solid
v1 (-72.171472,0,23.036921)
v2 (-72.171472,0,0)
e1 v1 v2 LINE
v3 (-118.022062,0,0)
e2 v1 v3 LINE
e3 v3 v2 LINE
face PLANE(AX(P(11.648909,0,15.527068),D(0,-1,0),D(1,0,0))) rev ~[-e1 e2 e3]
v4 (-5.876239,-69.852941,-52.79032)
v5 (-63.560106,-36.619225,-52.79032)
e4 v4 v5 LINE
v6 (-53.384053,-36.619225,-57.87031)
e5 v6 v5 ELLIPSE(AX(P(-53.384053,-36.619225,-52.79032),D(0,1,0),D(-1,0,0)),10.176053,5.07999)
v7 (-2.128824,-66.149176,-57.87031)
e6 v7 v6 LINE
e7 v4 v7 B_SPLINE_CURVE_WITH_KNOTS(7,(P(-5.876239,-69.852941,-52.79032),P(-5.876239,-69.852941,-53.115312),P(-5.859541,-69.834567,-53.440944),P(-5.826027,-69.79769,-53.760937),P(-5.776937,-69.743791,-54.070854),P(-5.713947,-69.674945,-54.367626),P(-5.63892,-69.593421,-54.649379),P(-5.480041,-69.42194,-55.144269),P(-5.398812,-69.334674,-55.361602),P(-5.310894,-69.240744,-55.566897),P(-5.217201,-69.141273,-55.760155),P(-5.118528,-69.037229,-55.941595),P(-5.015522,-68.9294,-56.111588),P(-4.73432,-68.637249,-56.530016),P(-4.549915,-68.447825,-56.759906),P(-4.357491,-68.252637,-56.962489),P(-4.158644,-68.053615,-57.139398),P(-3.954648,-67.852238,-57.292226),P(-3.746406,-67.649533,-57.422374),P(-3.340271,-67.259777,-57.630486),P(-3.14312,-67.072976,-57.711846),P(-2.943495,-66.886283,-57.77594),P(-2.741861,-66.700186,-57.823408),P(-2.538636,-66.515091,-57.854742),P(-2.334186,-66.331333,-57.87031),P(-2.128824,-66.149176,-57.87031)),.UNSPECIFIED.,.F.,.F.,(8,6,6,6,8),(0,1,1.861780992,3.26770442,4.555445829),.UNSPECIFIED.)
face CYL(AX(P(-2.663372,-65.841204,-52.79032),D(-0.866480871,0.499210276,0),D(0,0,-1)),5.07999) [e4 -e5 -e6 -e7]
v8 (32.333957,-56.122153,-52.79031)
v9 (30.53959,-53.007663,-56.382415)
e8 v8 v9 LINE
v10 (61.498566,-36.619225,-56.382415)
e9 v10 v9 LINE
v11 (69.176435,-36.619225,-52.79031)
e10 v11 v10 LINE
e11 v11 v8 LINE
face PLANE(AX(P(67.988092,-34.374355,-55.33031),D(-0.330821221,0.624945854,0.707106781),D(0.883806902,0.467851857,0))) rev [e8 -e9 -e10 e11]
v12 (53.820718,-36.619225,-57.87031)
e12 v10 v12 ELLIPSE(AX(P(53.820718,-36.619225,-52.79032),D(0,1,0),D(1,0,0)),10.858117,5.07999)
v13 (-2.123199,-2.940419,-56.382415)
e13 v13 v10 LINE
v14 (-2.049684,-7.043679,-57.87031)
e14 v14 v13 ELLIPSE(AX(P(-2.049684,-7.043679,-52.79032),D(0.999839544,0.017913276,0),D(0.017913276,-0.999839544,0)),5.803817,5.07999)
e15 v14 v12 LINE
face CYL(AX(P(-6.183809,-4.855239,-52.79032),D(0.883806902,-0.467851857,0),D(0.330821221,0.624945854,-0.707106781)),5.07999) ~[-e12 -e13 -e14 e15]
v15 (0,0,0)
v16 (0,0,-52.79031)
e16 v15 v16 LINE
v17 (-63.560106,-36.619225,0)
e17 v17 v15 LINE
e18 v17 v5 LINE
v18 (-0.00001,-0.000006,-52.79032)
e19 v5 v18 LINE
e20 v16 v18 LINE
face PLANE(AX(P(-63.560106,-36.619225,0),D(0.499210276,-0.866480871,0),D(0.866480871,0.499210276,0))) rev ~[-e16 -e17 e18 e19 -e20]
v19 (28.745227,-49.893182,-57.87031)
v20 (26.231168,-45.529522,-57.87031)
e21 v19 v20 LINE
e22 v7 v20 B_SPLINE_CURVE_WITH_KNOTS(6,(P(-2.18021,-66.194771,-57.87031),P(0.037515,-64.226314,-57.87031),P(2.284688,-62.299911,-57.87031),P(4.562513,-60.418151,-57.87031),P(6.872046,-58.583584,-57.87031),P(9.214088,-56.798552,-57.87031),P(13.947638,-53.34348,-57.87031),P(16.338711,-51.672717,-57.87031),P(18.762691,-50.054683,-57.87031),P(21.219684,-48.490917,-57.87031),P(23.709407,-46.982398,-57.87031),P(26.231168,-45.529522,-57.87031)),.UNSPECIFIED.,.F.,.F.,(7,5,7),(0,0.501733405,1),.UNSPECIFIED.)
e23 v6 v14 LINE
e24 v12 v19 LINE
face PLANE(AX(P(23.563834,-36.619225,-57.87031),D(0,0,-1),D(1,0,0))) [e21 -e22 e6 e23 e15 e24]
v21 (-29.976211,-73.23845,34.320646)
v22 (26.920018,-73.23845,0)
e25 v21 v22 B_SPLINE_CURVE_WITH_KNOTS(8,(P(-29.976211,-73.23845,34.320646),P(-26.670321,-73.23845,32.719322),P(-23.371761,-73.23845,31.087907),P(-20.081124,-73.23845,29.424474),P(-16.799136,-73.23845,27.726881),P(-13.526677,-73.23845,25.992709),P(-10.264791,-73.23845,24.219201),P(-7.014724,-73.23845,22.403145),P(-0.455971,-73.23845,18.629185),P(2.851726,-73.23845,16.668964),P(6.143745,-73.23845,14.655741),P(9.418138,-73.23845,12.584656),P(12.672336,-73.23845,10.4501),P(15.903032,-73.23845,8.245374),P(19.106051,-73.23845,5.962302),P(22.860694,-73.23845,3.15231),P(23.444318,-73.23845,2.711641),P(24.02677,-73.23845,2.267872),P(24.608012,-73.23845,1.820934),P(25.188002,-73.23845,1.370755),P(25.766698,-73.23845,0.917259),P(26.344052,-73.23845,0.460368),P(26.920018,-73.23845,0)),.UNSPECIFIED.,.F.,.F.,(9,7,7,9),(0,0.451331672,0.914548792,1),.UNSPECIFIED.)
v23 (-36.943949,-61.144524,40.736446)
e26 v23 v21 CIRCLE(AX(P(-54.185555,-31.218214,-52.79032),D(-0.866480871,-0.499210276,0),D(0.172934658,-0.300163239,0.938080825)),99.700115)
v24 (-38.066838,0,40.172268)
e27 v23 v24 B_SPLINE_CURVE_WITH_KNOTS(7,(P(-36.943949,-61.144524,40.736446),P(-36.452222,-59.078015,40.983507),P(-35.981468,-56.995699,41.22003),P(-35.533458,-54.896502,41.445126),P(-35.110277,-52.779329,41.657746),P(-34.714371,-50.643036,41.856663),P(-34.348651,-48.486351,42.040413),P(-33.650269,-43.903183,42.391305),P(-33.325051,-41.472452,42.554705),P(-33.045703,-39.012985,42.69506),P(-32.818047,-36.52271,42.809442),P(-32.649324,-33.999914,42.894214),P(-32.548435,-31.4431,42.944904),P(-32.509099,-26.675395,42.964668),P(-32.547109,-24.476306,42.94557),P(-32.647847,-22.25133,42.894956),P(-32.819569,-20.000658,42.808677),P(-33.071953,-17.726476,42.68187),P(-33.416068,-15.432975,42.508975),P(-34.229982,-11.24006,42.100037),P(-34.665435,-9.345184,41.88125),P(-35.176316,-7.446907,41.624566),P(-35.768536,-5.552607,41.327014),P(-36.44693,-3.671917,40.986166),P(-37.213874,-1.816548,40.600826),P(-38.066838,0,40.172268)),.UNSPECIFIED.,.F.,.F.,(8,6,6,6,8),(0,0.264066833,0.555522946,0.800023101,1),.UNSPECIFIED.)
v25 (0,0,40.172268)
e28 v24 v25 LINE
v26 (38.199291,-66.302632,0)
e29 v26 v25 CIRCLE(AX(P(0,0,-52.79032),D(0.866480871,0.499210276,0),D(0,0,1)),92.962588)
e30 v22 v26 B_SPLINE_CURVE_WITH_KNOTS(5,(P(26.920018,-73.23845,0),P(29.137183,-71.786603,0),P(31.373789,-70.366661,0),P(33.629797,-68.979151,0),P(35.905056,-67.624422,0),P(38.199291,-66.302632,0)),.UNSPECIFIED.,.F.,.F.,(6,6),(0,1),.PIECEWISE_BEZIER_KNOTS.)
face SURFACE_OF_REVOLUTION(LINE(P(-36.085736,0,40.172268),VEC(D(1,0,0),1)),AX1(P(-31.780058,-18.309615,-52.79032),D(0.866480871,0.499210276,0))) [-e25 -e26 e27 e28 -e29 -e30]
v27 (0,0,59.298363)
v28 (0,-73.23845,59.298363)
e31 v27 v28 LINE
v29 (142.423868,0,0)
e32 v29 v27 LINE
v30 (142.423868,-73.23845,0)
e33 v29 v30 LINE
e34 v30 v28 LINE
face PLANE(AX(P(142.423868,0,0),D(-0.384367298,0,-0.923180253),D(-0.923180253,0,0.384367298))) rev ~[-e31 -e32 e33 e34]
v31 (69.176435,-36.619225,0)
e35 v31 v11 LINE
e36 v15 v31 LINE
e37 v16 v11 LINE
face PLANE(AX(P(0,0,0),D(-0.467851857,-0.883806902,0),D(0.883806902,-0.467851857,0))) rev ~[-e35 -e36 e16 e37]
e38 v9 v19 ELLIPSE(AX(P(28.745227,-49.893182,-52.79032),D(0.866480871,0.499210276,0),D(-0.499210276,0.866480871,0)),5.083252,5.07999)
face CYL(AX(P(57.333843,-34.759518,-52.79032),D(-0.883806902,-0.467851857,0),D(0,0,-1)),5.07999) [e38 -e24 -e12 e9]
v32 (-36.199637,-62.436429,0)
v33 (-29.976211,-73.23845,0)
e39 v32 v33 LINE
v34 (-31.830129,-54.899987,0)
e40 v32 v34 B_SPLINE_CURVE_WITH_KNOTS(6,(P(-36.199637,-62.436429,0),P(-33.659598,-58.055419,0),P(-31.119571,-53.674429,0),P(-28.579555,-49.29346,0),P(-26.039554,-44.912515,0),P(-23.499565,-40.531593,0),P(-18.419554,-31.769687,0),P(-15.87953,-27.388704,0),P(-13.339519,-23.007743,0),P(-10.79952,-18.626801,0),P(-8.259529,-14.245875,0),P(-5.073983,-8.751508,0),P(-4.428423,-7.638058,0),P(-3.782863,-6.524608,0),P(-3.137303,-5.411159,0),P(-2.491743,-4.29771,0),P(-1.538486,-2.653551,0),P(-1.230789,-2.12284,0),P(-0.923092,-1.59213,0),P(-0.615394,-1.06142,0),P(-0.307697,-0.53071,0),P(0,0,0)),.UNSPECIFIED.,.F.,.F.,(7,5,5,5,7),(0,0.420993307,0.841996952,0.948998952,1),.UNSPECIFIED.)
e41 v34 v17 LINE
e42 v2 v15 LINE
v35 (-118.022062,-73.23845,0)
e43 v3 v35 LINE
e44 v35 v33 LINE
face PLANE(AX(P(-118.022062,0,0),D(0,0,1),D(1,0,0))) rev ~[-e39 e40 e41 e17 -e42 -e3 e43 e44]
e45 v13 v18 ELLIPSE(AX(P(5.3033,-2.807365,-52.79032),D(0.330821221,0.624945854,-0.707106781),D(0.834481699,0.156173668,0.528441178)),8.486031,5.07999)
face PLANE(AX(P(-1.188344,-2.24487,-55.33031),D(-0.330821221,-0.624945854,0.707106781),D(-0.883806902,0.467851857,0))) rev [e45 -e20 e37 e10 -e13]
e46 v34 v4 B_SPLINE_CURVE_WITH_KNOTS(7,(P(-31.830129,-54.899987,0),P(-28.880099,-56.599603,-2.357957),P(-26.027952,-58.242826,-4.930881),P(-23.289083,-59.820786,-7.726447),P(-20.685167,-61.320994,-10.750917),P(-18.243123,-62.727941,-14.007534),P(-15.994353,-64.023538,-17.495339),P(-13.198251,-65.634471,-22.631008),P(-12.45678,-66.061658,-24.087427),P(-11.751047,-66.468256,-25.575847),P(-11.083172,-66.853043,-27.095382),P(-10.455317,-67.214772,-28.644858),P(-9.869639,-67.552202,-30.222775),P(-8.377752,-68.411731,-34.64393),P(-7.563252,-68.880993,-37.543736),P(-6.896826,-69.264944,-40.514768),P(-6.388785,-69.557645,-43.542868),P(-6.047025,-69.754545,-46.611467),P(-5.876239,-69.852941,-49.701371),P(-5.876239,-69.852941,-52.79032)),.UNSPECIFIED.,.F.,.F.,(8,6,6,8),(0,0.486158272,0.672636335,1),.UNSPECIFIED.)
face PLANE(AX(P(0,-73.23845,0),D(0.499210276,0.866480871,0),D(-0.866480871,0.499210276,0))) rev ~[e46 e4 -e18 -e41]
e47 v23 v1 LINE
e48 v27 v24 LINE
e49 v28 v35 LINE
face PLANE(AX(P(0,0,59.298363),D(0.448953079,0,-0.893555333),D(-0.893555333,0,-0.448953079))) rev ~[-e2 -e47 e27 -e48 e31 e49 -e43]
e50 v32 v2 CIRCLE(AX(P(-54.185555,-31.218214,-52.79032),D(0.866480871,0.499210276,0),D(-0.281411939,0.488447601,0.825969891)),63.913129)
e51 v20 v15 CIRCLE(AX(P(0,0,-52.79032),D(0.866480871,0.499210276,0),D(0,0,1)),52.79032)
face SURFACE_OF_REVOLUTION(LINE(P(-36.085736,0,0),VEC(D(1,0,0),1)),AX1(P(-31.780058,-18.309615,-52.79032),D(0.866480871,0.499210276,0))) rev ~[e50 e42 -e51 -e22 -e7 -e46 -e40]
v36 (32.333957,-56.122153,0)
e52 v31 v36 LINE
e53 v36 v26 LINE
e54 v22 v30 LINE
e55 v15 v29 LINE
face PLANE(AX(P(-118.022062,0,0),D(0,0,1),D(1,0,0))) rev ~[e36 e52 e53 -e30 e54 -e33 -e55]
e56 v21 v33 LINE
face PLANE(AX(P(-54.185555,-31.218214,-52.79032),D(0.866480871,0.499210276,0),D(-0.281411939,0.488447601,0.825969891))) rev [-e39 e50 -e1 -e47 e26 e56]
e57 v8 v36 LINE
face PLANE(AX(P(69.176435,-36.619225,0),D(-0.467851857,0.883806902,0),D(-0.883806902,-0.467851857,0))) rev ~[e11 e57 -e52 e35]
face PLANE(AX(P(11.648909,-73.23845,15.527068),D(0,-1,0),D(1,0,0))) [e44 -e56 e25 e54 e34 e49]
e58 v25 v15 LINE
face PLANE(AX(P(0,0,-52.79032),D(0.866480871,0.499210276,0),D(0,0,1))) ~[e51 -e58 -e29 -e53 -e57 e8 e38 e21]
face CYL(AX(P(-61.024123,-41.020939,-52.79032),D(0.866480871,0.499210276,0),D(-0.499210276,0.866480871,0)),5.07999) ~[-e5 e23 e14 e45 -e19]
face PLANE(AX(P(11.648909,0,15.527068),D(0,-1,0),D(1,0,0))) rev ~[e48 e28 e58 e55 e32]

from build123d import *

# Parameters (mm, degrees)
F1_DEPTH = 73.23845
F3_DEPTH = 57.87031
F4_SIZE  = 5.08
F5_R     = 5.07999
F6_W     = 72.171472013
F6_H     = 40.1722677052


# Not quite as in the source:
# - a fillet or chamfer is up to 0.001 mm smaller than in the source, because OpenCascade refuses the exact size


with BuildPart() as f1:
    # F0 (on Front) → F1 (new body)
    with BuildSketch(Plane.XZ):
        Polygon((0, 59.2983625829), (-118.0220618844, 0), (142.4238681793, 0), align=None)
    extrude(amount=F1_DEPTH)

    # F2 (on face) → F3 (join)
    with BuildSketch(Plane(origin=(0, 0, 0), x_dir=(1, 0, 0), z_dir=(0, 0, -1))):
        Polygon((69.1764354706, 36.619225), (0, 73.23845), (0, 0), align=None)
        Polygon((0, 0), (0, 73.23845), (-63.5601058602, 36.619225), align=None)
    extrude(amount=F3_DEPTH)

    # F4
    f4_edges = [f1.edges().sort_by_distance(p)[0] for p in [
        (34.588218, -18.309613, -57.87031),
        (34.588218, -54.928838, -57.87031),
    ]]
    chamfer(f4_edges, length=F4_SIZE)

    # F5 (radius 5.08 in the source; OpenCascade refuses exactly that, so slightly less here)
    f5_edges = [f1.edges().sort_by_distance(p)[0] for p in [
        (-34.37973, -53.431071, -57.87031),
        (-34.37973, -19.807379, -57.87031),
        (26.559471, -19.807379, -57.87031),
        (26.559471, -53.431071, -57.87031),
    ]]
    fillet(f5_edges, radius=F5_R)

    # F6 (on Front) → F7 (revolve)
    with BuildSketch(Plane.XZ):
        with Locations((-36.0857360065, 20.0861338526)):
            Rectangle(F6_W, F6_H)
    revolve(axis=Axis((-31.7800580476, -18.3096154484, -52.79032), (0.8664808713, 0.4992102759, 0)))


solid = f1.part
